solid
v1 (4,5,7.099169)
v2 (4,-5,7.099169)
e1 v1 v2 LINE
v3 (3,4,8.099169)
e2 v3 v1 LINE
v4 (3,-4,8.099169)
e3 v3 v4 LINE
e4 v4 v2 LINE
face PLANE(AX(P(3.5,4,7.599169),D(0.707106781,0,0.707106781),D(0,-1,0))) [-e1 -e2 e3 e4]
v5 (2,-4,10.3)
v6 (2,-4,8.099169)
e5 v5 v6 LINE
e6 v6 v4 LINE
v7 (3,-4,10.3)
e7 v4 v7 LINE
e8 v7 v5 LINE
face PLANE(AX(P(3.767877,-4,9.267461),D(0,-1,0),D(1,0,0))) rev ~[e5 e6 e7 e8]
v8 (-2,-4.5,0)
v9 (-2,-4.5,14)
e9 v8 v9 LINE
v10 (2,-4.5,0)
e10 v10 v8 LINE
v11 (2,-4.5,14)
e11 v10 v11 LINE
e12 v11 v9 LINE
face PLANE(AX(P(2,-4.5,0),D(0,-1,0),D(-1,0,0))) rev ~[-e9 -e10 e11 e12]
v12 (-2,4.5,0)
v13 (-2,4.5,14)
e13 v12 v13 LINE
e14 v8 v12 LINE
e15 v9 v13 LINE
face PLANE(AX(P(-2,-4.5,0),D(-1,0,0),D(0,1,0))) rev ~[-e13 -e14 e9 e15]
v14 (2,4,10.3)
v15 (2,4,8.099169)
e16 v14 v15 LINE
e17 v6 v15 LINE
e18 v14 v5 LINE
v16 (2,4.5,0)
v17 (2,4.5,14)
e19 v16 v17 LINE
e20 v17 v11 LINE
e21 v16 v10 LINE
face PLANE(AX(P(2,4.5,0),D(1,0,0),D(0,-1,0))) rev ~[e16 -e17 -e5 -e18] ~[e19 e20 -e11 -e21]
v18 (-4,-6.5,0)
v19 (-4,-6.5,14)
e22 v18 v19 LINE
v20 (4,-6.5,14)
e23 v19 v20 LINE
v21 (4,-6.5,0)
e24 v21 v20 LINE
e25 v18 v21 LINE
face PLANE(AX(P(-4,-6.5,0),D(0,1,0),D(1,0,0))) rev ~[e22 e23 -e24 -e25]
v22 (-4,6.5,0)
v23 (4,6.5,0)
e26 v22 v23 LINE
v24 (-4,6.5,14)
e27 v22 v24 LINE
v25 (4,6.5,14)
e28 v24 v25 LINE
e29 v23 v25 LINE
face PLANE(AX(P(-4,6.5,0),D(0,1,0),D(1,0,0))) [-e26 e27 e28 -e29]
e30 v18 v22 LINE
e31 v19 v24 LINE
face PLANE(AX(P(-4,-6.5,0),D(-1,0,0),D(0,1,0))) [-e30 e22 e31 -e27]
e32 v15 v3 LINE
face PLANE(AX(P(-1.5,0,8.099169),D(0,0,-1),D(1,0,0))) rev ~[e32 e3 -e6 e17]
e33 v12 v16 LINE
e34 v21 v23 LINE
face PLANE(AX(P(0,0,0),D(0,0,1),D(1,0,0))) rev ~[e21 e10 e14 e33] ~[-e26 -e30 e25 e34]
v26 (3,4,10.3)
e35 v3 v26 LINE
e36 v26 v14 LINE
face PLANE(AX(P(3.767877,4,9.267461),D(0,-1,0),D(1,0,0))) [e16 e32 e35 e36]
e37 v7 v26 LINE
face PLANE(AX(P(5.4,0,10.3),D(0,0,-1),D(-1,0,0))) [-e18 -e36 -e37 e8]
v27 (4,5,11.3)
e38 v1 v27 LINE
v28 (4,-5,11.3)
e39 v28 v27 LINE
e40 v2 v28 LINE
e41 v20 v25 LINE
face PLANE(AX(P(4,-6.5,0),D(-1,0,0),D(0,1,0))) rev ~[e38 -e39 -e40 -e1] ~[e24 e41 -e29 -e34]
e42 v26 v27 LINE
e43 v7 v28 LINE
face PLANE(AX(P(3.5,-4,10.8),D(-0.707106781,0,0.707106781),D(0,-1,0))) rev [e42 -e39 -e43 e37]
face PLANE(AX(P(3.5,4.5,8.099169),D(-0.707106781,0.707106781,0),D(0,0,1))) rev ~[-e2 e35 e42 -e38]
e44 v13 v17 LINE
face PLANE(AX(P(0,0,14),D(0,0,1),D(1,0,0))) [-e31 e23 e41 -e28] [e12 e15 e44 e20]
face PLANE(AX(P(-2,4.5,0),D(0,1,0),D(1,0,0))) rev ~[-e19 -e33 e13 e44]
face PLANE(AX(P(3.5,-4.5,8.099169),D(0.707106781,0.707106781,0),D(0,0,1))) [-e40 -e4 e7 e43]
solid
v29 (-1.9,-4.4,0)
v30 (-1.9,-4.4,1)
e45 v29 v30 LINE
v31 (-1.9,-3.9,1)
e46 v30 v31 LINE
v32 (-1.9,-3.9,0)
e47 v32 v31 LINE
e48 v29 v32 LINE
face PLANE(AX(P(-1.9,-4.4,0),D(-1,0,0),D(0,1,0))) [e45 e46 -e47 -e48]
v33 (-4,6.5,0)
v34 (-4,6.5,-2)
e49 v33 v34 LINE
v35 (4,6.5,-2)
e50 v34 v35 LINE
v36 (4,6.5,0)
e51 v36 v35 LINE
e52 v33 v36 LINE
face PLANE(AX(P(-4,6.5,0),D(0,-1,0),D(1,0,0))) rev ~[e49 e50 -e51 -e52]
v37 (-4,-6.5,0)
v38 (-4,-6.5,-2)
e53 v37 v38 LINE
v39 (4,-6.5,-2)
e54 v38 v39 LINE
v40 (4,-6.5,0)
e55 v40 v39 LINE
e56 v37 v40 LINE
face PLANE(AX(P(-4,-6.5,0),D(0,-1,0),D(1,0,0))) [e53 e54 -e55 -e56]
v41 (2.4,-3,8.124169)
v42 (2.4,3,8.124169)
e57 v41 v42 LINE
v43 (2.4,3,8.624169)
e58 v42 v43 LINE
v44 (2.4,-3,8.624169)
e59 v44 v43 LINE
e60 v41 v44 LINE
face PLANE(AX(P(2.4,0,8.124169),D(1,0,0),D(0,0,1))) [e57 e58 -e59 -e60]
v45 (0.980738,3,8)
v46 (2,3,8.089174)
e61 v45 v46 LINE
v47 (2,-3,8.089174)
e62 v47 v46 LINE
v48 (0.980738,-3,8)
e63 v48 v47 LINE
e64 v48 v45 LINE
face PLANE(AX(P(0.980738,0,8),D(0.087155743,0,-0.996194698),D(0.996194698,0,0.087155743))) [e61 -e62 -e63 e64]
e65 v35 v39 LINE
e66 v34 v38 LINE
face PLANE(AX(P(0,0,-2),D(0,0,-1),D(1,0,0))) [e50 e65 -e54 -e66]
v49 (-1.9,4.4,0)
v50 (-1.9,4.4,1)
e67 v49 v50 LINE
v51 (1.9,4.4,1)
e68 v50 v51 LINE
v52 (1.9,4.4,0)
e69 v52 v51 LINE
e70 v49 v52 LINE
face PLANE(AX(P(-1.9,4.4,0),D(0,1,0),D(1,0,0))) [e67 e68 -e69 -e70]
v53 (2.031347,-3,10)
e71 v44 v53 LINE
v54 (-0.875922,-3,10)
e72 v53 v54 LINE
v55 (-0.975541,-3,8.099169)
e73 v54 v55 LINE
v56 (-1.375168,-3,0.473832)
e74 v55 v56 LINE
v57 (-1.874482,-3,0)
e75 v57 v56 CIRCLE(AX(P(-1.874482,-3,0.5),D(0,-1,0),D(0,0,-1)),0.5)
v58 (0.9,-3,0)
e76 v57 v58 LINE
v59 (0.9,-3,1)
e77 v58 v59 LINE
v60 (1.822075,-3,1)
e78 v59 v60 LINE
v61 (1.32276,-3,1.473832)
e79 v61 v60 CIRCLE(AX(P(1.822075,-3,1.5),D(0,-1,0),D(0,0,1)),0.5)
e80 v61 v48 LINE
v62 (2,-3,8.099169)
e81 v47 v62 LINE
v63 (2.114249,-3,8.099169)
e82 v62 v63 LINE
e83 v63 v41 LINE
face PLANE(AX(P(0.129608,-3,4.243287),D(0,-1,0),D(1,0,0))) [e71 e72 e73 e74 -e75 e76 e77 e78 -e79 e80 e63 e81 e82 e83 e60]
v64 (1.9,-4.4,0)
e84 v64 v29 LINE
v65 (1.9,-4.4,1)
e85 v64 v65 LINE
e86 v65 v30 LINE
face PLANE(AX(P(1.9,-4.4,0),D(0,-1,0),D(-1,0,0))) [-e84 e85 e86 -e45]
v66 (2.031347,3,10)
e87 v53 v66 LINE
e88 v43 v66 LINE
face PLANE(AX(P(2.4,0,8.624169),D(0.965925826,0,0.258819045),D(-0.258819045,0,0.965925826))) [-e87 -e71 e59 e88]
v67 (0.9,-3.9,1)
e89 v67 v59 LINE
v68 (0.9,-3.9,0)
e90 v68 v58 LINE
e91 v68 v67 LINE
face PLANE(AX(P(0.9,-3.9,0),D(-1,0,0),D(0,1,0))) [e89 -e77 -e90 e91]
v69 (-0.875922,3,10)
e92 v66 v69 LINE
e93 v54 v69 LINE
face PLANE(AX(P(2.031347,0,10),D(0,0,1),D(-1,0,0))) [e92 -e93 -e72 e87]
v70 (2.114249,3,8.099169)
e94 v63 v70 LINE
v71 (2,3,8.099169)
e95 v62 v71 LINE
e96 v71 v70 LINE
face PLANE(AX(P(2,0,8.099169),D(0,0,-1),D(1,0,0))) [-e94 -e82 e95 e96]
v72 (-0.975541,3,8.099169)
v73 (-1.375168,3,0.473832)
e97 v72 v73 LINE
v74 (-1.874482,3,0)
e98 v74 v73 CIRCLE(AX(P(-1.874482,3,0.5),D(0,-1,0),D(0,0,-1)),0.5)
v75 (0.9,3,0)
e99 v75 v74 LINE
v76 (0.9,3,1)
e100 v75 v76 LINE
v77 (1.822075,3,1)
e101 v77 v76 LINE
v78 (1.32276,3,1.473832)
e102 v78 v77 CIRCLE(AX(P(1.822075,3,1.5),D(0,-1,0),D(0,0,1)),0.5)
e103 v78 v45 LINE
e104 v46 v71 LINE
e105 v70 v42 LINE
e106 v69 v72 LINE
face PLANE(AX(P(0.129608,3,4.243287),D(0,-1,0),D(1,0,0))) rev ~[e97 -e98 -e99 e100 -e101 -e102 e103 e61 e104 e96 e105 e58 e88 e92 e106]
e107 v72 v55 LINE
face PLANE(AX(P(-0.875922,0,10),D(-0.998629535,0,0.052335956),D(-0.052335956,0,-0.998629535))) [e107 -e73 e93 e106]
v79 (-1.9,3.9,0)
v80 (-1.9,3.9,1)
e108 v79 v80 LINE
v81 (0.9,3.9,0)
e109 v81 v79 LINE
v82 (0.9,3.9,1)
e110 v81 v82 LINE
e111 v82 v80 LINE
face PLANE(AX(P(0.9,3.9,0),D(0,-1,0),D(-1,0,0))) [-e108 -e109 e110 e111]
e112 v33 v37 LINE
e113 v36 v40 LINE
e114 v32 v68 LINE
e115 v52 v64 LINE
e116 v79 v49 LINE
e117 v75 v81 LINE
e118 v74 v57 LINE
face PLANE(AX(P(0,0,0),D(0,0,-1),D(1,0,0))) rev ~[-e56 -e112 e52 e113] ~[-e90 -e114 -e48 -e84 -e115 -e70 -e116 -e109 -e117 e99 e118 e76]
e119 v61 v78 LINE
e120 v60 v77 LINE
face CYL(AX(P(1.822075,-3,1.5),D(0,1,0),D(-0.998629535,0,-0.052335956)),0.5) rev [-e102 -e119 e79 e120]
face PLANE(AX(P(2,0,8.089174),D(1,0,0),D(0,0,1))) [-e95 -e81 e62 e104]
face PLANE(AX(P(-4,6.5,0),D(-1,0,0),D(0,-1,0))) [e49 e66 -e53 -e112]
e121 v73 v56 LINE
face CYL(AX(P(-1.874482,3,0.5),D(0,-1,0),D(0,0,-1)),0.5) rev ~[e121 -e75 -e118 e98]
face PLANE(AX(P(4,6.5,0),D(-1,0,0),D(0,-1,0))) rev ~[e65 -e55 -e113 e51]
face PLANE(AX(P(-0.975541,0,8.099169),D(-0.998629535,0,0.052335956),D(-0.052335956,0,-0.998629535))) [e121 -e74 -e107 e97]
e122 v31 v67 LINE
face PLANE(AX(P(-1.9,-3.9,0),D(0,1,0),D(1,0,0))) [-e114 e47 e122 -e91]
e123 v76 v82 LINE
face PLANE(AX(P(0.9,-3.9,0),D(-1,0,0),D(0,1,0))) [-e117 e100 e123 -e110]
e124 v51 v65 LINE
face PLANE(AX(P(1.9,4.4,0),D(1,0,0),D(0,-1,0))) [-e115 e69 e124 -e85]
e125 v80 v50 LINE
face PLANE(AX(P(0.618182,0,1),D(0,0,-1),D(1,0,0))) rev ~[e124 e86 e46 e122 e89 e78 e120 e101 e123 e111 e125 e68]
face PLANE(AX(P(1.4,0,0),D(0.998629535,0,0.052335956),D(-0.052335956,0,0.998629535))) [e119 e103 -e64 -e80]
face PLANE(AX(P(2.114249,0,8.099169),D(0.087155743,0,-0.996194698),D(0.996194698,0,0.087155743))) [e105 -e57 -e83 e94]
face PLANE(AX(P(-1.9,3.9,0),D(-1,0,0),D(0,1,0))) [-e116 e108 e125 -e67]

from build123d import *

# Parameters (mm, degrees)
F0_W          = 8
F0_H          = 13
F1_DEPTH      = 14
F3_W          = 8
F3_H          = 13
F3_W_2        = 4
F3_H_2        = 9
F3_W_3        = 2.8
F3_H_3        = 7.8
F4_DEPTH      = 2
F5_DEPTH      = 1
F6_DEPTH      = 3
F6_DEPTH_BACK = 3
F7_R          = 0.5
F8_DEPTH      = 4
F8_DEPTH_BACK = 4
F9_SIZE       = 1


with BuildPart() as f1:
    # F0 (on Top) → F1 (new body)
    with BuildSketch(Plane.XY):
        Rectangle(F0_W, F0_H)
        Polygon((-2, 0), (-2, 4.5), (0, 4.5), (2, 4.5), (2, 0), (2, -4.5), (0, -4.5), (-2, -4.5), align=None, mode=Mode.SUBTRACT)
    extrude(amount=F1_DEPTH)

    # F2 (on Front) → F8 (cut, two sides)
    with BuildSketch(Plane.XZ) as f8_sk:
        Polygon((2, 10.3), (2, 10), (2.03134729, 10), (2.4, 10), (2.4, 8.6241693561), (2.4, 8.1241693561), (2.4, 8.0991693561), (5.4, 8.0991693561), (5.4, 10.3), align=None)
        Polygon((-1.5, 8.0991693561), (-1.4, 8.0991693561), (-1.4, 10), (-0.8759222072, 10), (2, 10), (2, 10.3), (-1.5, 10.3), align=None)
        Polygon((-1.4, 8.0991693561), (-0.97554052, 8.0991693561), (-0.8759222072, 10), (-1.4, 10), align=None)
        Polygon((2.4, 10), (2.03134729, 10), (2.4, 8.6241693561), align=None)
        Polygon((-0.8759222072, 10), (-0.97554052, 8.0991693561), (2, 8.0991693561), (2, 10), align=None)
        Polygon((2, 10), (2, 8.0991693561), (2.1142486924, 8.0991693561), (2.4, 8.1241693561), (2.4, 8.6241693561), (2.03134729, 10), align=None)
        Polygon((2.4, 8.1241693561), (2.1142486924, 8.0991693561), (2.4, 8.0991693561), align=None)
    extrude(amount=-F8_DEPTH, mode=Mode.SUBTRACT)
    extrude(f8_sk.sketch, amount=F8_DEPTH_BACK, mode=Mode.SUBTRACT)

    # F9
    f9_edges = [f1.edges().sort_by_distance(p)[0] for p in [
        (4, 0, 10.3),
        (4, 4, 9.199585),
        (4, 0, 8.099169),
        (4, -4, 9.199585),
    ]]
    chamfer(f9_edges, length=F9_SIZE)


with BuildPart() as f4:
    # F3 (on face) → F4 (new body)
    with BuildSketch(Plane(origin=(0, 0, 0), x_dir=(1, 0, 0), z_dir=(0, 0, -1))):
        Rectangle(F3_W, F3_H)
        Rectangle(F3_W_2, F3_H_2, mode=Mode.SUBTRACT)
        Rectangle(F3_W_2, F3_H_2)
        Polygon((-1.9, 3.9), (-1.9, 4.4), (1.9, 4.4), (1.9, -4.4), (-1.9, -4.4), (-1.9, -3.9), align=None, mode=Mode.SUBTRACT)
        with Locations((-0.5, 0)):
            Rectangle(F3_W_3, F3_H_3)
        Polygon((1.9, 4.4), (-1.9, 4.4), (-1.9, 3.9), (0.9, 3.9), (0.9, -3.9), (-1.9, -3.9), (-1.9, -4.4), (1.9, -4.4), align=None)
    extrude(amount=F4_DEPTH)

    # F3 (on face) → F5 (join)
    with BuildSketch(Plane(origin=(0, 0, 0), x_dir=(1, 0, 0), z_dir=(0, 0, -1))):
        Polygon((1.9, 4.4), (-1.9, 4.4), (-1.9, 3.9), (0.9, 3.9), (0.9, -3.9), (-1.9, -3.9), (-1.9, -4.4), (1.9, -4.4), align=None)
    extrude(amount=-F5_DEPTH)

    # F2 (on Front) → F6 (join, two sides)
    with BuildSketch(Plane.XZ) as f6_sk:
        Polygon((-0.97554052, 8.0991693561), (-1.4, 0), (1.4, 0), (0.9807377657, 8), (2, 8.0891738907), (2, 8.0991693561), align=None)
        Polygon((2, 10), (2, 8.0991693561), (2.1142486924, 8.0991693561), (2.4, 8.1241693561), (2.4, 8.6241693561), (2.03134729, 10), align=None)
        Polygon((-0.8759222072, 10), (-0.97554052, 8.0991693561), (2, 8.0991693561), (2, 10), align=None)
    extrude(amount=F6_DEPTH)
    extrude(f6_sk.sketch, amount=-F6_DEPTH_BACK)

    # F7
    f7_edges = [f4.edges().sort_by_distance(p)[0] for p in [
        (-1.4, 0, 0),
        (1.347592, 0, 1),
    ]]
    fillet(f7_edges, radius=F7_R)


solid = Compound([f1.part, f4.part])
